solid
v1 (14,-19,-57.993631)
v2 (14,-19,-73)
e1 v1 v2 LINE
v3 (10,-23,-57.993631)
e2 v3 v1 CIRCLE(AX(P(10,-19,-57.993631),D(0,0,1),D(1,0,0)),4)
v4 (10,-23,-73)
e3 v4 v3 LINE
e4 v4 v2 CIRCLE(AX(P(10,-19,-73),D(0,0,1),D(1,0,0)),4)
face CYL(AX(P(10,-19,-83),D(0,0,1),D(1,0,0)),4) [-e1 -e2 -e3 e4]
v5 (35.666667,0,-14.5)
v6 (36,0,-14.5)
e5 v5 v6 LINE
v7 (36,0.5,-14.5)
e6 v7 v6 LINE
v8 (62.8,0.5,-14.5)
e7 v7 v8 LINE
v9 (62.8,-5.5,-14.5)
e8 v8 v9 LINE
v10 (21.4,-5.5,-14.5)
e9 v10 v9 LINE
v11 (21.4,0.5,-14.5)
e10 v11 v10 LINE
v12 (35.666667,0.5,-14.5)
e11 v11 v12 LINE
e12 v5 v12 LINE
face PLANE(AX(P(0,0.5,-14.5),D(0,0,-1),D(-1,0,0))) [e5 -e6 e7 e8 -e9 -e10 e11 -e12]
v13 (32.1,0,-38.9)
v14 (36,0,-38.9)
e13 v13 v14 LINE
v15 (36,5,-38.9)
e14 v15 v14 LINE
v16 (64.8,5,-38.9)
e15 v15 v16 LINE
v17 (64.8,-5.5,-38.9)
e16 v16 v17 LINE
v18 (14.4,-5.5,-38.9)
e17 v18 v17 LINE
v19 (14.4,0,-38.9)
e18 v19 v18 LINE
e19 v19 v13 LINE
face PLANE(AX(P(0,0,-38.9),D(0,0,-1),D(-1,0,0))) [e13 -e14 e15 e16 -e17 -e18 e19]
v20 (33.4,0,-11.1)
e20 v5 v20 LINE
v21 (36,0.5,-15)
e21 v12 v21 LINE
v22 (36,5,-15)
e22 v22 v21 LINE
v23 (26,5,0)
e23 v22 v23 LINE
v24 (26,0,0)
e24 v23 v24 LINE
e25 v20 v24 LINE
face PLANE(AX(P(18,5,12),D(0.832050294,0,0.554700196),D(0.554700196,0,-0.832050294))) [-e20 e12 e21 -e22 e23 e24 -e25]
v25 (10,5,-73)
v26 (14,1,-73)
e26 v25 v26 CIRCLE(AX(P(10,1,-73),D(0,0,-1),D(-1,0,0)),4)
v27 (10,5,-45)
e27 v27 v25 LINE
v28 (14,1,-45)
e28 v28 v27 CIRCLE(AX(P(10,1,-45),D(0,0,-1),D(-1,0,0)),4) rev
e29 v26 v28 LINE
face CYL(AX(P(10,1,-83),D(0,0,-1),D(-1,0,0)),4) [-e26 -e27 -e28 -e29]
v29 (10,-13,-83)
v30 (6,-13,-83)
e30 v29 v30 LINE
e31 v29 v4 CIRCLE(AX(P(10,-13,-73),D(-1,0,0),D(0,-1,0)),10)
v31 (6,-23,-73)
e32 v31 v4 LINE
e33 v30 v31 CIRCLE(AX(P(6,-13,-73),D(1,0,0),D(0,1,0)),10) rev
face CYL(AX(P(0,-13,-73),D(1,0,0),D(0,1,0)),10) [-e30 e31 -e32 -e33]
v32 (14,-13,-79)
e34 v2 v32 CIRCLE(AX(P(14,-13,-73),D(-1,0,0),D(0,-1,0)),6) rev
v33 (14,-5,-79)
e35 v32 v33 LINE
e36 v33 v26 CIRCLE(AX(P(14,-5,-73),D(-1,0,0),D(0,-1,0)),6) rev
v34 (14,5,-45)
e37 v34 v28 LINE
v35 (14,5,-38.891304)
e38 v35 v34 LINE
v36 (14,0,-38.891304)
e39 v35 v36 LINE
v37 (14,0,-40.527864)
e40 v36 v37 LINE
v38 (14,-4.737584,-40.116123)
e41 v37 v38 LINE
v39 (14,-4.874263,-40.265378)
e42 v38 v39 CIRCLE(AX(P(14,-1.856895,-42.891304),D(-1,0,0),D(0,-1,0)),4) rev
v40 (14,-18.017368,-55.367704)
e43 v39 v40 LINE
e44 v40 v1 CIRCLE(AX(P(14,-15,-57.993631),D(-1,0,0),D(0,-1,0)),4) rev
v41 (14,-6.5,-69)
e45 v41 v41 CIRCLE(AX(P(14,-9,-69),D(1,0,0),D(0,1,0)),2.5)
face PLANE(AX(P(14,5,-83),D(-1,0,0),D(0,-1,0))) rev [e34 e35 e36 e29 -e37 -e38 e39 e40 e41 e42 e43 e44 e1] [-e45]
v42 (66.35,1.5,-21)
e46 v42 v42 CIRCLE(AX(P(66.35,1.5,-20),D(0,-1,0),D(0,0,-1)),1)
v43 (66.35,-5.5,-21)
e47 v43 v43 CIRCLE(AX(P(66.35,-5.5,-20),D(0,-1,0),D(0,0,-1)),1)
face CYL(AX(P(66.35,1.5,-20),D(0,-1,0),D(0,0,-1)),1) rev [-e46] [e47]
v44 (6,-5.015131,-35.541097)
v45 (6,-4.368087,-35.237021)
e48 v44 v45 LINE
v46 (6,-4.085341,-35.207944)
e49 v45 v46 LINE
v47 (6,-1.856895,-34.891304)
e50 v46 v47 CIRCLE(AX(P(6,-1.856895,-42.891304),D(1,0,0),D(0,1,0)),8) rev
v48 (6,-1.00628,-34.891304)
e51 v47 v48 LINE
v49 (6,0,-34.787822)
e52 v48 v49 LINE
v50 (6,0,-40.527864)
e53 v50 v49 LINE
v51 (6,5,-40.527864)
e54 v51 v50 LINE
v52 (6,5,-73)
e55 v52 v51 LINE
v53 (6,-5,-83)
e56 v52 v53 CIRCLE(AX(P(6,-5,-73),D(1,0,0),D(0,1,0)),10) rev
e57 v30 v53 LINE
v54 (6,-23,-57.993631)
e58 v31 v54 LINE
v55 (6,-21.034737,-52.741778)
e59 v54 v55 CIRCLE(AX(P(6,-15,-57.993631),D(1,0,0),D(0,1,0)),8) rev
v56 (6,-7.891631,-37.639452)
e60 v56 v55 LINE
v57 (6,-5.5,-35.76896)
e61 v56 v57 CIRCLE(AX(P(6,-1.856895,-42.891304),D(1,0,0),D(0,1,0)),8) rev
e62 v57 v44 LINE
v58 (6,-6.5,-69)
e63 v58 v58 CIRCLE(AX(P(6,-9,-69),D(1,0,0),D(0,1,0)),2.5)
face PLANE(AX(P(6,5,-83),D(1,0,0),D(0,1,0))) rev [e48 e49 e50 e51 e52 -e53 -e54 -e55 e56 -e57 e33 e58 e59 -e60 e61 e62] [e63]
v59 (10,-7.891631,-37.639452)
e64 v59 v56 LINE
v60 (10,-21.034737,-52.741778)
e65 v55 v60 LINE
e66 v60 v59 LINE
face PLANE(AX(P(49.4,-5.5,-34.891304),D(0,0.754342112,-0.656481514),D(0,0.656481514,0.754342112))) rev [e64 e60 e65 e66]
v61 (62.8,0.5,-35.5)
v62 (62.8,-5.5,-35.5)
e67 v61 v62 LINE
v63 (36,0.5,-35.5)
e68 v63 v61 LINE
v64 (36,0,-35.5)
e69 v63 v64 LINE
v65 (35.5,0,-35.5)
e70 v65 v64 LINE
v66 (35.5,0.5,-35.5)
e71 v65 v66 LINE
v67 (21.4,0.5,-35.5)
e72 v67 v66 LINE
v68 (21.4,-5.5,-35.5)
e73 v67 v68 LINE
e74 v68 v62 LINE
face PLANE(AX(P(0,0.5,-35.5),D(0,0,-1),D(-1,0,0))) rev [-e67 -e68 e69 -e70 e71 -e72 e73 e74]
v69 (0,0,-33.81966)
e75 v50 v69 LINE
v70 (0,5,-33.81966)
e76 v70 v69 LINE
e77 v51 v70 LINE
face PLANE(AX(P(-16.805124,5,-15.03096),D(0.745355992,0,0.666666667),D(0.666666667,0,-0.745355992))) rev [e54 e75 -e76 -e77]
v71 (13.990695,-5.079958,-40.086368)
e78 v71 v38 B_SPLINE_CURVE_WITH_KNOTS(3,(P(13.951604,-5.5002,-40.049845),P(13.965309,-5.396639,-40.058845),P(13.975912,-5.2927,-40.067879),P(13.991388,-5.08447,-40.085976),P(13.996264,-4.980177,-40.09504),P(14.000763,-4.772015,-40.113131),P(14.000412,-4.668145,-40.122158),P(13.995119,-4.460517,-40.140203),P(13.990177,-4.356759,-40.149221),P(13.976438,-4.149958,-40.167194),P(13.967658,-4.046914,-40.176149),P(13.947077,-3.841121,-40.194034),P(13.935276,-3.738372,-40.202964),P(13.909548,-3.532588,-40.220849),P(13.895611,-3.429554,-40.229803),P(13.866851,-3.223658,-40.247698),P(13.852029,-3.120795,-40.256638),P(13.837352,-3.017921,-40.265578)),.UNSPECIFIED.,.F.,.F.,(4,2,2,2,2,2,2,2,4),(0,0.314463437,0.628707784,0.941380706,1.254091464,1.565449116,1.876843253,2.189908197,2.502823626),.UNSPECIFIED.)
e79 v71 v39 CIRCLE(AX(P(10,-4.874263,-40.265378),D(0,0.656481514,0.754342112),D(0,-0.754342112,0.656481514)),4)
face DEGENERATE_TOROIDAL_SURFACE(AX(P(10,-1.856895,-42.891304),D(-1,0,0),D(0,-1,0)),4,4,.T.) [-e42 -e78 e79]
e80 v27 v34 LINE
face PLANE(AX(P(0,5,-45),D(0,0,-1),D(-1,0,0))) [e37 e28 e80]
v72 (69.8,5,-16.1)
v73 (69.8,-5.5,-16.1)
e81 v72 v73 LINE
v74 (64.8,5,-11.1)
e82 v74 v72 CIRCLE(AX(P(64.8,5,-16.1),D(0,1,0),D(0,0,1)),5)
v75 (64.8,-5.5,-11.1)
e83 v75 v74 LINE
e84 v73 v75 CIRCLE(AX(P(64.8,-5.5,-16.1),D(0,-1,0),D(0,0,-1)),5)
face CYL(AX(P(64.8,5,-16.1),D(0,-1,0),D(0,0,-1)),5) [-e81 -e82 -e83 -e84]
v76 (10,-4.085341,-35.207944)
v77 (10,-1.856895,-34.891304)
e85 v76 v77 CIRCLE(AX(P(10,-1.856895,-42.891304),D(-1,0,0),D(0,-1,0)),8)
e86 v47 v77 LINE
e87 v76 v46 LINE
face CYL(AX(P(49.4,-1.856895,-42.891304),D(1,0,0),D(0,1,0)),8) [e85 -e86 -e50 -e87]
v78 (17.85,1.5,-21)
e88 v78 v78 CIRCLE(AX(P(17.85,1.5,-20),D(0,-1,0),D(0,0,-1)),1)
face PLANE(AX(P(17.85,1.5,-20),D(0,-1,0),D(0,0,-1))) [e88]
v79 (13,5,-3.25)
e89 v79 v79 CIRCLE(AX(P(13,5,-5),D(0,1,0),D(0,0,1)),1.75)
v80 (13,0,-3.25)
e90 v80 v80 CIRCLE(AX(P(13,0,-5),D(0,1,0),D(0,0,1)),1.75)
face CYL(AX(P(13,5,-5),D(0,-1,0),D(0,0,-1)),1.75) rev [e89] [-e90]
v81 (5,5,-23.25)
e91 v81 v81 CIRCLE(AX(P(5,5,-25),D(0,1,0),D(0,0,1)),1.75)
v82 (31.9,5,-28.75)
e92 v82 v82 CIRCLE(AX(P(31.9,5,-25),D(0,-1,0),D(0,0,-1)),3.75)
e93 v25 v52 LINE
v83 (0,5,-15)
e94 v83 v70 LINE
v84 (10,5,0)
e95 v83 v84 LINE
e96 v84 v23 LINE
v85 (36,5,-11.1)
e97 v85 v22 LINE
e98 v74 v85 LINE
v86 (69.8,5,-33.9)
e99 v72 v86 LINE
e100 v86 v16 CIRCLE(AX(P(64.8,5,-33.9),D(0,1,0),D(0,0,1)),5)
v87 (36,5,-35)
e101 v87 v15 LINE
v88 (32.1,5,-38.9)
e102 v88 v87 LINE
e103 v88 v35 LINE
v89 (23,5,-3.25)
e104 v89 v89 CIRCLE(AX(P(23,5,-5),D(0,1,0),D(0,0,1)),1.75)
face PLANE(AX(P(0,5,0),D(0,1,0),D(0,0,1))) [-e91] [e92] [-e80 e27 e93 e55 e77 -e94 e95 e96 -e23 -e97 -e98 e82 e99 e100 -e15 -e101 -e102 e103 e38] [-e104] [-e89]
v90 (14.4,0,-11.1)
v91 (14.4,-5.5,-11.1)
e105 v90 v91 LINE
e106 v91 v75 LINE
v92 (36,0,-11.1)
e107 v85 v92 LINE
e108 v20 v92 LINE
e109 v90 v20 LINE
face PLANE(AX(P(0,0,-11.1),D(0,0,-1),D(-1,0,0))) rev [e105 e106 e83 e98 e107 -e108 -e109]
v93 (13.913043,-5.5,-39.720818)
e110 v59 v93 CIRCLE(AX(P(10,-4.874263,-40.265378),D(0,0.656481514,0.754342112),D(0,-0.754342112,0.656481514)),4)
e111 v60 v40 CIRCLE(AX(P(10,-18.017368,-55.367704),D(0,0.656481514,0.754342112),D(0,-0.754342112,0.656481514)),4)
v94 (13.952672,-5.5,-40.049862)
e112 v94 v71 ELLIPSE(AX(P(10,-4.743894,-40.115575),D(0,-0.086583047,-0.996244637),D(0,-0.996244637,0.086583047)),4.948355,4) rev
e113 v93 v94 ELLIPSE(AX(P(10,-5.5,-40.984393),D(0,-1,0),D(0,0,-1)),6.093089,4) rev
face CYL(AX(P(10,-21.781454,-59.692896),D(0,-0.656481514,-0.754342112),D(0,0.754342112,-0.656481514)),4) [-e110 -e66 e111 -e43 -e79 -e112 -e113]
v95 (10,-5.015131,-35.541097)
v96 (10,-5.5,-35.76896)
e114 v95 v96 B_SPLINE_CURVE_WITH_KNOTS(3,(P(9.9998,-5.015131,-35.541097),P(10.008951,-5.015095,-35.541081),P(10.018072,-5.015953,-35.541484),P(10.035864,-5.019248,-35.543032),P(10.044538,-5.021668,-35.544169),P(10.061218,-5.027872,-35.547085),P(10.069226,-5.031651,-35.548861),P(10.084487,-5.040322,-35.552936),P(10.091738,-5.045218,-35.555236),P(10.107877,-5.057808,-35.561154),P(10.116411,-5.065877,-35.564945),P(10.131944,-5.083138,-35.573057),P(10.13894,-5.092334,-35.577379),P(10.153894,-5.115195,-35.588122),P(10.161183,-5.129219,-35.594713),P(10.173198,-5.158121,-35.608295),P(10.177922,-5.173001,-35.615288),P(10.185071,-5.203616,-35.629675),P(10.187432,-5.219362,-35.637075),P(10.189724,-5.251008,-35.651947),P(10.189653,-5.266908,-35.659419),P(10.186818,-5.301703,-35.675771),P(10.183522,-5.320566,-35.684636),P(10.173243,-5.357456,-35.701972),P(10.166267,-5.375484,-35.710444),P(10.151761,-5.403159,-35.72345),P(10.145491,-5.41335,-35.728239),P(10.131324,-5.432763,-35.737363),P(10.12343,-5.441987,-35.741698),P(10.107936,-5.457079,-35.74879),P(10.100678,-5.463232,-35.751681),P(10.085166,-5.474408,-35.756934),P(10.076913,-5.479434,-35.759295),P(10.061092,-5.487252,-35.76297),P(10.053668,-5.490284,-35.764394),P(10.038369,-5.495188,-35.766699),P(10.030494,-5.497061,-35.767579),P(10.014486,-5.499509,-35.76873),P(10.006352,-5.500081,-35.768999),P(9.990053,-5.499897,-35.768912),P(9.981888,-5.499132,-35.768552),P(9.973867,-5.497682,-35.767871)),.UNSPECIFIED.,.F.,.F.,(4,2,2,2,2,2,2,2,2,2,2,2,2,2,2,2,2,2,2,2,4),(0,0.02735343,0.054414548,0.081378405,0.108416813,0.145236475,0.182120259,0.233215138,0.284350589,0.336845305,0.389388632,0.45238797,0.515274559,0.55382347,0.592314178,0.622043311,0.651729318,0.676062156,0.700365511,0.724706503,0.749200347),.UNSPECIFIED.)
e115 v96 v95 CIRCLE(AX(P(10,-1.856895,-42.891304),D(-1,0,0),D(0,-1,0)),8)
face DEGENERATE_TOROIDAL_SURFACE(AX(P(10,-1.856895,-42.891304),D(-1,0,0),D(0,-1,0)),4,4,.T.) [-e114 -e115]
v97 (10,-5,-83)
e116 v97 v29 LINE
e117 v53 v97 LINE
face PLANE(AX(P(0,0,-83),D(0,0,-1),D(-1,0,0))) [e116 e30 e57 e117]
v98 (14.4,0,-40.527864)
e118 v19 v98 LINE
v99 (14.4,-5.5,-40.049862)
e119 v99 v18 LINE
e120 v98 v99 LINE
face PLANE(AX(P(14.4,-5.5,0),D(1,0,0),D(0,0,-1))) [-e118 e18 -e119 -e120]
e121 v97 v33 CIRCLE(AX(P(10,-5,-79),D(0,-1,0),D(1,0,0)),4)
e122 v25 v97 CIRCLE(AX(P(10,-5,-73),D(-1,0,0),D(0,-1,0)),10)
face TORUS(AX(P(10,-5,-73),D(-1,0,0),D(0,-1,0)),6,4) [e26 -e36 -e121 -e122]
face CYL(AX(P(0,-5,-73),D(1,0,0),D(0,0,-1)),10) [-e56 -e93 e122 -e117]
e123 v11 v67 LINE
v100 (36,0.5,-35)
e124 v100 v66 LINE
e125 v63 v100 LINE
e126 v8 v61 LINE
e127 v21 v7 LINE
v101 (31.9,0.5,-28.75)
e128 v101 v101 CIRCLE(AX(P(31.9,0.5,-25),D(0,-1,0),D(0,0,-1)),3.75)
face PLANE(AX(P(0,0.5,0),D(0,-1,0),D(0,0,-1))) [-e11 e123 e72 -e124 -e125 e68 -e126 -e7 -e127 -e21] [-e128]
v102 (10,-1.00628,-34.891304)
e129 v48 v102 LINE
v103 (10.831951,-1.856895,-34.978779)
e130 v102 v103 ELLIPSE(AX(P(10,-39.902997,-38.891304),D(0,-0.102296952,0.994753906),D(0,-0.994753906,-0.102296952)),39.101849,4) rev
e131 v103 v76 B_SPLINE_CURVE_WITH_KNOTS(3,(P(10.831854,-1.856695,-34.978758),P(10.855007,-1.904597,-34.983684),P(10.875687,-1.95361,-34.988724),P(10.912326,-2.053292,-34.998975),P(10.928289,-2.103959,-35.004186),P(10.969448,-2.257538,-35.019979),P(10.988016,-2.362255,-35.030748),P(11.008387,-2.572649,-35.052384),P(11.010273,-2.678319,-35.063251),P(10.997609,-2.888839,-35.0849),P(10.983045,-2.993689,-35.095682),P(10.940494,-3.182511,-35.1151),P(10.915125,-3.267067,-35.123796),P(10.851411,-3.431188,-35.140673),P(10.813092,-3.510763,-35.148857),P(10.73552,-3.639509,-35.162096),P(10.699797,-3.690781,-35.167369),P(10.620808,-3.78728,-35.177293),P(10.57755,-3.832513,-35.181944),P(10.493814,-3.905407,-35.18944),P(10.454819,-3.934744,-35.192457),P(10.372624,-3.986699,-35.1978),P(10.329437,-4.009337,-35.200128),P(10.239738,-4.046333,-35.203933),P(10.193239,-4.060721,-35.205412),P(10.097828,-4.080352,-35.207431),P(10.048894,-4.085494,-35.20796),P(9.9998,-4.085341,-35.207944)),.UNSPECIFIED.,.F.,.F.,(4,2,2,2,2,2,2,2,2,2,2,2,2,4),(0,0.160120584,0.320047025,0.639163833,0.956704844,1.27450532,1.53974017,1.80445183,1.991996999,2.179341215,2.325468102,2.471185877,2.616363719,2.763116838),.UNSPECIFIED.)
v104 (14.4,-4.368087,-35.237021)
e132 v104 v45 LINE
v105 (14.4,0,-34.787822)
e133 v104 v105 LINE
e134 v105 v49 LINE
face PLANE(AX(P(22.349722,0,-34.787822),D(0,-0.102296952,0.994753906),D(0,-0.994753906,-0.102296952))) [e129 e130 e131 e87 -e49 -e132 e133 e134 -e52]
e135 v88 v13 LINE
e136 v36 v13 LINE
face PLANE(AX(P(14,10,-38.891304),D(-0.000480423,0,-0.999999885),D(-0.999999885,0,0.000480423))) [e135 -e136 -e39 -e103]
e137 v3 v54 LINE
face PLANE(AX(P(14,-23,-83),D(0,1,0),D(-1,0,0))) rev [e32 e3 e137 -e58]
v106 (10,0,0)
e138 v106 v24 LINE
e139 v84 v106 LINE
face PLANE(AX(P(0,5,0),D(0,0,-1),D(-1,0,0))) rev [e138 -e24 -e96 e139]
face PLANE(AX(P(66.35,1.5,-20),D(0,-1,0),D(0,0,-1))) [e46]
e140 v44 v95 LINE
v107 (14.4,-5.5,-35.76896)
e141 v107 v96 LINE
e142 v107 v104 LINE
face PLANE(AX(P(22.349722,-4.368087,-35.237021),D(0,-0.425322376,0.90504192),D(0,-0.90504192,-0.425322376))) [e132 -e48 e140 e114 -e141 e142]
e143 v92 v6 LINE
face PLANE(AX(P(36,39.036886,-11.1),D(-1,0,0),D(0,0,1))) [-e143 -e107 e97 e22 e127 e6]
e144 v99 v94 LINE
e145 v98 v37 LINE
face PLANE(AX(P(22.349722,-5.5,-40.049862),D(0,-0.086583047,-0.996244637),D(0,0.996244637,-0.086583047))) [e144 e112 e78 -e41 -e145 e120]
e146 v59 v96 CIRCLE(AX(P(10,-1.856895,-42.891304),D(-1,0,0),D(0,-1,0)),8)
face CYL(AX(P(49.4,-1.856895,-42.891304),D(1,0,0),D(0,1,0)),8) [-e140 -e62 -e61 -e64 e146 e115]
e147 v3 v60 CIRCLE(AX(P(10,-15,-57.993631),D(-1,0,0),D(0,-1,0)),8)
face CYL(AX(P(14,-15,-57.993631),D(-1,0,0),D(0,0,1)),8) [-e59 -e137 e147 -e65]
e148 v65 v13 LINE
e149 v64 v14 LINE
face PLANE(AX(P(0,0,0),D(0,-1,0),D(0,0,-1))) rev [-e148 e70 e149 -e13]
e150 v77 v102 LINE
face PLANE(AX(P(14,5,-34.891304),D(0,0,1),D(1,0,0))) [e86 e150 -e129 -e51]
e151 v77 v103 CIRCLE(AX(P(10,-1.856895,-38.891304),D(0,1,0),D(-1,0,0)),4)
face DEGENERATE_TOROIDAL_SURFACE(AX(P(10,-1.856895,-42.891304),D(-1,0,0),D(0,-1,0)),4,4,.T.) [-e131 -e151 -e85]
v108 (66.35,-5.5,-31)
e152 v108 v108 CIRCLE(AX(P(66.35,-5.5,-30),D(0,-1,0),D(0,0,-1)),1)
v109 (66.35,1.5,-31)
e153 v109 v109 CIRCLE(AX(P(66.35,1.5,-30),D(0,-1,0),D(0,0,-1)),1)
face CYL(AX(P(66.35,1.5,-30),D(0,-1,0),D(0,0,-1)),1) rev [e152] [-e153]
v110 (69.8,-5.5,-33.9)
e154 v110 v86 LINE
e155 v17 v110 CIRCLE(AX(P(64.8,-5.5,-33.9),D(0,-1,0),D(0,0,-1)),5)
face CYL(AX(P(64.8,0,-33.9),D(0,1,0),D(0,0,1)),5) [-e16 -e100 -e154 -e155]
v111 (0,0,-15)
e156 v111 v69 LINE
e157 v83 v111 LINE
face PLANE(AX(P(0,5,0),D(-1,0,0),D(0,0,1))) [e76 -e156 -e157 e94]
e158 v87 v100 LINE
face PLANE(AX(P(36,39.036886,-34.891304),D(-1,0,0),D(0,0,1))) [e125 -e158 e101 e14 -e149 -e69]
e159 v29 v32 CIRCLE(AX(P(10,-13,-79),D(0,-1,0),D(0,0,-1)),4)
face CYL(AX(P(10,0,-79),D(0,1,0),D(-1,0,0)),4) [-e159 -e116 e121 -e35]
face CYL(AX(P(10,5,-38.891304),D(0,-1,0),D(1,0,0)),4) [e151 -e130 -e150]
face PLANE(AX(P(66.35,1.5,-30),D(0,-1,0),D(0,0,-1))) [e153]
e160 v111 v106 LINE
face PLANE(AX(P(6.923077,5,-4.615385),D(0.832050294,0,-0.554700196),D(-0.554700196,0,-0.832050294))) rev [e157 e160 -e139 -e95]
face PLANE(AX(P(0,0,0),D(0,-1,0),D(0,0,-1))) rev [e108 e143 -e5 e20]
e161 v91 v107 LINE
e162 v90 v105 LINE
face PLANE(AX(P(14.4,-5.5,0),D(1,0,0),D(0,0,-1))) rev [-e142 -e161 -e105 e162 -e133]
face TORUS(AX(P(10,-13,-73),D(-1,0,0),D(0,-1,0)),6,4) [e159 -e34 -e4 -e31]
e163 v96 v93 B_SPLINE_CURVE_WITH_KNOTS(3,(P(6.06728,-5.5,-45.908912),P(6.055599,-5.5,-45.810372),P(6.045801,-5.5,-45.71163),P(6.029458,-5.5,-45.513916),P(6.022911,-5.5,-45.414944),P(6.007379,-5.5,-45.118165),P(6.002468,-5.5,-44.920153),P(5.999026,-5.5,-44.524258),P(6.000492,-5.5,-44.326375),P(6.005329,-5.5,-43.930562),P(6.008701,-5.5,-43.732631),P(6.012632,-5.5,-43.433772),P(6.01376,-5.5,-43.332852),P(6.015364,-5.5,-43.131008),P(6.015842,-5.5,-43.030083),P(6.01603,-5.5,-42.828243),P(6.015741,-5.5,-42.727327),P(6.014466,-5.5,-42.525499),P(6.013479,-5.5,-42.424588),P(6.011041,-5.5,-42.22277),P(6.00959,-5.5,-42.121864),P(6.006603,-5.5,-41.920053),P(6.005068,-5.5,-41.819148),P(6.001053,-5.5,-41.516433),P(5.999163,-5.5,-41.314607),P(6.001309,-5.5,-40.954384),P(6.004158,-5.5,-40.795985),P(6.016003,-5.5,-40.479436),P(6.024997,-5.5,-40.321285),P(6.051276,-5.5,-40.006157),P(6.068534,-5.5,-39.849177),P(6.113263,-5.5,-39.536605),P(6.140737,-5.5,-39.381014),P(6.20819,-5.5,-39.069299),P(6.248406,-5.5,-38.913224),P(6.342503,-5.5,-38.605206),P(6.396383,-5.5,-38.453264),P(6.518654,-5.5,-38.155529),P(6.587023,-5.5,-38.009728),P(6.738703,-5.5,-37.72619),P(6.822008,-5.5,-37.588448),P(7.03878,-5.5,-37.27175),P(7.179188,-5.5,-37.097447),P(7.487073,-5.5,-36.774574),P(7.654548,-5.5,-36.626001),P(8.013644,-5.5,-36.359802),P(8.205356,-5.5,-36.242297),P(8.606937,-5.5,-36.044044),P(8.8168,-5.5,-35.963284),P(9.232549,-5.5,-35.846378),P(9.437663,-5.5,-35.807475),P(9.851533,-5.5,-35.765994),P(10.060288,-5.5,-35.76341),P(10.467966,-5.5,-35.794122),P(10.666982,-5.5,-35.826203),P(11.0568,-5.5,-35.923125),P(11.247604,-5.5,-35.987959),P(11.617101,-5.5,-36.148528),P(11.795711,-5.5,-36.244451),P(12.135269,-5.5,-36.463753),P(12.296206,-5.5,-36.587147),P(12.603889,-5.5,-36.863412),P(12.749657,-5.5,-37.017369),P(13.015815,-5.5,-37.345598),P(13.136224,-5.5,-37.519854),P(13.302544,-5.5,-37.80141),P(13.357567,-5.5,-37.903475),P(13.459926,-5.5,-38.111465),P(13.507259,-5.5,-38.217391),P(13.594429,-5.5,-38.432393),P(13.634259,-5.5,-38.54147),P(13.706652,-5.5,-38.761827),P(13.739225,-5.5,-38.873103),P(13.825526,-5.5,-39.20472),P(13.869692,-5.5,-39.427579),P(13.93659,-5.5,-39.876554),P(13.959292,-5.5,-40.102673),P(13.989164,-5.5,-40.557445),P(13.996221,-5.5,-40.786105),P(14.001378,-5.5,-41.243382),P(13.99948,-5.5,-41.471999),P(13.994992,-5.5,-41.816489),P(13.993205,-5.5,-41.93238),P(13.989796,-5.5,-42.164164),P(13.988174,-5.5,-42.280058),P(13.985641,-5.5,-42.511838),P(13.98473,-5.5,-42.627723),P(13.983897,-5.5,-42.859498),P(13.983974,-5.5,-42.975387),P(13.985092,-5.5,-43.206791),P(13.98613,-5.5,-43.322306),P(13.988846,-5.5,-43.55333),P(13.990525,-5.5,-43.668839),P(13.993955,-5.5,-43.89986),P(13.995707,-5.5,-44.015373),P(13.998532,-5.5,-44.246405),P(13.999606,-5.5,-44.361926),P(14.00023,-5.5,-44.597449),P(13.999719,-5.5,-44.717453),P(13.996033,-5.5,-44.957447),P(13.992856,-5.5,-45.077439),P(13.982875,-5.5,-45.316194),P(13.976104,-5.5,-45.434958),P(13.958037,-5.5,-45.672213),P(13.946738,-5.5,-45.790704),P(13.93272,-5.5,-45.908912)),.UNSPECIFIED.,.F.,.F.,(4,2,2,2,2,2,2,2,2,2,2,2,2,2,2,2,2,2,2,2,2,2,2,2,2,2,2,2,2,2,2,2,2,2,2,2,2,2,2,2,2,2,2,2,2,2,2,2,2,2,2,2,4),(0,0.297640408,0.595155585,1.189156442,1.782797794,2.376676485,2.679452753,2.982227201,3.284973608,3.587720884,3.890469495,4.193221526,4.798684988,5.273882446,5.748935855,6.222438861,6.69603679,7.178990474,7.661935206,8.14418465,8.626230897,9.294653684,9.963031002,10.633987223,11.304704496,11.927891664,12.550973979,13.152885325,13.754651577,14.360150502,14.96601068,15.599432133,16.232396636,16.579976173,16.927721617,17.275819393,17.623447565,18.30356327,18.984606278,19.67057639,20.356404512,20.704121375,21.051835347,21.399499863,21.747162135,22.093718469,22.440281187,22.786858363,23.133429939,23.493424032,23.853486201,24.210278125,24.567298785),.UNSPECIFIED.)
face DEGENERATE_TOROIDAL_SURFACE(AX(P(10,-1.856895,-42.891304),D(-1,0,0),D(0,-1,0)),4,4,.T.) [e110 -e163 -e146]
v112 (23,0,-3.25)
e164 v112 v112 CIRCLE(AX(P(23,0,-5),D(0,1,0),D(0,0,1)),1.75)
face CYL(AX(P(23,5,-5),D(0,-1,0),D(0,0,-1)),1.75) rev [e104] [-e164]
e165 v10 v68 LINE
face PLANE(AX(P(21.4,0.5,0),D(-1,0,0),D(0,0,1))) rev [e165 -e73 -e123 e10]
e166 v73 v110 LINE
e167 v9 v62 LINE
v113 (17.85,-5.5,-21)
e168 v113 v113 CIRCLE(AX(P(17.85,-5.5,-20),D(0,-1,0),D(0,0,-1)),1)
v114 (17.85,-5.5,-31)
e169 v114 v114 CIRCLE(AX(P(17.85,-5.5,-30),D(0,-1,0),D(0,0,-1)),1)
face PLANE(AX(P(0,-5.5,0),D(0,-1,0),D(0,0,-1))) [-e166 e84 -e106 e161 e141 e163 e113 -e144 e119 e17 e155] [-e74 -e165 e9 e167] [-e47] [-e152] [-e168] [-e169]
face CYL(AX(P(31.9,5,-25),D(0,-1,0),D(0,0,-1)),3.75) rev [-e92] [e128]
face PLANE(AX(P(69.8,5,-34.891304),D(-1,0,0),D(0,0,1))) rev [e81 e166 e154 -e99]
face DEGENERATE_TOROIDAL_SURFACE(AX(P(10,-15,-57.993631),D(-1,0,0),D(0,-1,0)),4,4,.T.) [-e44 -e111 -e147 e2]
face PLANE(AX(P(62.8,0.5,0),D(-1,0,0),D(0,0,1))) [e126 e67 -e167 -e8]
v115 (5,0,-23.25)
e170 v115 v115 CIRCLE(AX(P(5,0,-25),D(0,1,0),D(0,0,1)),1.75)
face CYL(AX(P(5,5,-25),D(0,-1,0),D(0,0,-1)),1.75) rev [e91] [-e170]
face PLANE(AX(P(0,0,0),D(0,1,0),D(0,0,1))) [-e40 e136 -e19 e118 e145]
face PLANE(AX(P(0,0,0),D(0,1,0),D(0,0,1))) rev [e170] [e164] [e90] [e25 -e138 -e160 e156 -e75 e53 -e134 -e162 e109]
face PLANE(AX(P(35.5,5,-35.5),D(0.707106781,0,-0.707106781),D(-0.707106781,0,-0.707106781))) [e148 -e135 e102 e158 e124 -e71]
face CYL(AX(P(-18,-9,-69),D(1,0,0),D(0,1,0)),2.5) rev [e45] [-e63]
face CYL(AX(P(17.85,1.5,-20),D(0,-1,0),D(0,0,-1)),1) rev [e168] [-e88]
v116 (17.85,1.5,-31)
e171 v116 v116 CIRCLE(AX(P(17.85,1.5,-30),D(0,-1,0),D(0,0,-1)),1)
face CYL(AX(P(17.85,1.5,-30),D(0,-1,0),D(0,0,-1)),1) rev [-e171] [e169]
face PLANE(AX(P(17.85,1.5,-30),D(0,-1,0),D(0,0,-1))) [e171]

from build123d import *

# Parameters (mm, degrees)
SKETCH1_R               = 1.75
SKETCH1_W               = 7.2
SKETCH1_H               = 10.8
BOSS_EXTRUDE2_DEPTH     = 5
FILLET1_R               = 5.4
FILLET2_R               = 5.4
FILLET3_RADIUS          = 10
FILLET3_LENGTH          = 5
SKETCH2_W               = 35
SKETCH2_H               = 19.782608696
SKETCH2_W_2             = 23
SKETCH2_H_2             = 13
BOSS_EXTRUDE3_DEPTH     = 5.5
SKETCH3_W               = 23
SKETCH3_H               = 13
CUT_EXTRUDE1_DEPTH      = 3.5
CUT_EXTRUDE2_DEPTH      = 76.201396264
CUT_EXTRUDE2_DEPTH_BACK = 76.201396264
SKETCH6_W               = 13.4
SKETCH6_H               = 0.108695652
CUT_EXTRUDE3_DEPTH      = 13.5
SKETCH7_W               = 8
SKETCH7_H               = 28
BOSS_EXTRUDE5_DEPTH     = 38
SKETCH8_R               = 2.5
CUT_EXTRUDE4_DEPTH      = 32
FILLET5_R               = 10
SKETCH9_R               = 1
CUT_EXTRUDE5_DEPTH      = 7
BOSS_EXTRUDE6_START     = -8
BOSS_EXTRUDE6_DEPTH     = 8
CUT_EXTRUDE8_DEPTH      = 97.444595494
FILLET8_R               = 8
FILLET10_R              = 4
BOSS_EXTRUDE7_START     = -1.5
BOSS_EXTRUDE7_OUTLINE_W = 23
BOSS_EXTRUDE7_OUTLINE_H = 13
BOSS_EXTRUDE7_DEPTH     = 1.5
SKETCH15_R              = 1
BOSS_EXTRUDE8_DEPTH     = 7
SKETCH16_W              = 23
SKETCH16_H              = 13
BOSS_EXTRUDE9_DEPTH     = 9
SKETCH23_W              = 22.4
SKETCH23_H              = 19.782608696
BOSS_EXTRUDE11_DEPTH    = 10.5
SKETCH32_W              = 2
SKETCH32_H              = 19.782608696
CUT_EXTRUDE10_DEPTH     = 112.132758447
SKETCH33_W              = 21.6
SKETCH33_H              = 4.008695652
BOSS_EXTRUDE26_DEPTH    = 5.5
SKETCH34_W              = 33.8
SKETCH34_H              = 4.008695652
BOSS_EXTRUDE27_DEPTH    = 10.5
SKETCH39_W              = 41.4
SKETCH39_H              = 21
CUT_EXTRUDE15_DEPTH     = 6
SKETCH40_R              = 1
CUT_EXTRUDE16_DEPTH     = 7
SKETCH41_R              = 1.75
SKETCH41_R_2            = 3.75
CUT_EXTRUDE17_DEPTH     = 111.965264835
CUT_EXTRUDE18_DEPTH     = 10
FILLET12_R              = 5
BOSS_EXTRUDE28_REACH    = 109.184


with BuildPart() as part:
    # Sketch1 → Boss-Extrude2 (new body)
    # profile 1 of 2: a face of its own
    with BuildSketch(Plane(origin=(0, 0, 0), x_dir=(1, 0, 0), z_dir=(0, 1, 0))):
        Polygon((26, 45), (10, 45), (0, 33.819660113), (0, 15), (10, 0), (26, 0), (36, 15), (60, 15), (60, 35), (36, 35), align=None)
        with Locations(Location((13, 5, 0), (0, 0, 270))):
            Circle(SKETCH1_R, mode=Mode.SUBTRACT)
        with Locations(Location((23, 5, 0), (0, 0, 270))):
            Circle(SKETCH1_R, mode=Mode.SUBTRACT)
        with Locations(Location((5, 25, 0), (0, 0, 270))):
            Circle(SKETCH1_R, mode=Mode.SUBTRACT)
        Polygon((26.5, 30.4), (37.3, 30.4), (44.5, 30.4), (44.5, 19.6), (37.3, 19.6), (26.5, 19.6), align=None, mode=Mode.SUBTRACT)
    # profile 2 of 2: a face of its own
    with BuildSketch(Plane(origin=(0, 0, 0), x_dir=(1, 0, 0), z_dir=(0, 1, 0))):
        with Locations((40.9, 25)):
            Rectangle(SKETCH1_W, SKETCH1_H)
    extrude(amount=BOSS_EXTRUDE2_DEPTH)

    # Fillet1
    fillet1_edges = [part.edges().sort_by_distance(p)[0] for p in [
        (37.3, 2.5, -19.6),
        (37.3, 2.5, -30.4),
    ]]
    fillet(fillet1_edges, radius=FILLET1_R - 0.0001)  # a hair under: the kernel refuses the full size

    # Fillet2
    fillet2_edges = [part.edges().sort_by_distance(p)[0] for p in [
        (26.5, 2.5, -30.4),
        (26.5, 2.5, -19.6),
    ]]
    fillet(fillet2_edges, radius=FILLET2_R - 0.0001)  # a hair under: the kernel refuses the full size

    # Fillet3: full round fillet: the end face becomes a half cylinder, R = half its width
    fillet3_face = Plane((60, 2.5, -25), x_dir=(0, 1, 0), z_dir=(1, 0, 0))  # on the end face: x along it, z out of the body
    fillet3_slab = fillet3_face.offset(-FILLET3_RADIUS / 2) * Box(FILLET3_LENGTH, 2 * FILLET3_RADIUS, FILLET3_RADIUS, mode=Mode.PRIVATE)  # the body's end, R deep
    fillet3_round = Plane((50, 2.5, -25), x_dir=(1, 0, 0), z_dir=(0, 1, 0)) * Cylinder(FILLET3_RADIUS, FILLET3_LENGTH, mode=Mode.PRIVATE)  # its axis R under the face
    add(fillet3_slab - fillet3_round, mode=Mode.SUBTRACT)

    # Sketch2 → Boss-Extrude3 (add)
    with BuildSketch(Plane.XZ):
        with Locations((31.9, -25)):
            Rectangle(SKETCH2_W, SKETCH2_H)
        with Locations((31.9, -25)):
            Rectangle(SKETCH2_W_2, SKETCH2_H_2, mode=Mode.SUBTRACT)
    extrude(amount=BOSS_EXTRUDE3_DEPTH)

    # Sketch3 → Cut-Extrude1 (cut)
    with BuildSketch(Plane.XZ):
        with Locations((31.9, -25)):
            Rectangle(SKETCH3_W, SKETCH3_H)
    extrude(amount=-CUT_EXTRUDE1_DEPTH, mode=Mode.SUBTRACT)

    # Sketch4 → Cut-Extrude2 (cut, two sides: drawn at the far end of the back side and taken through both)
    with BuildSketch(Plane.XZ.offset(-CUT_EXTRUDE2_DEPTH_BACK)):
        with BuildLine():
            Line((49.4, -15), (49.4, -35))
            Line((49.4, -35), (50, -35))
            ThreePointArc((50, -35), (60, -25), (50, -15))
            Line((50, -15), (49.4, -15))
        make_face()
    extrude(amount=CUT_EXTRUDE2_DEPTH + CUT_EXTRUDE2_DEPTH_BACK, mode=Mode.SUBTRACT)

    # Sketch6 → Cut-Extrude3 (cut)
    with BuildSketch(Plane.XZ):
        with Locations((42.7, -34.945652174)):
            Rectangle(SKETCH6_W, SKETCH6_H)
        with Locations((42.7, -15.054347826)):
            Rectangle(SKETCH6_W, SKETCH6_H)
    extrude(amount=-CUT_EXTRUDE3_DEPTH, mode=Mode.SUBTRACT)

    # Sketch7 → Boss-Extrude5 (add)
    with BuildSketch(Plane(origin=(0, 0, -45), x_dir=(-1, 0, 0), z_dir=(0, 0, -1))):
        with Locations((-10, -9)):
            Rectangle(SKETCH7_W, SKETCH7_H)
    extrude(amount=BOSS_EXTRUDE5_DEPTH)

    # Sketch8 → Cut-Extrude4 (cut)
    with BuildSketch(Plane(origin=(14, 0, 0), x_dir=(0, 0, -1), z_dir=(1, 0, 0))):
        with Locations(Location((69, -9, 0), (0, 0, 90))):
            Circle(SKETCH8_R)
    extrude(amount=-CUT_EXTRUDE4_DEPTH, mode=Mode.SUBTRACT)

    # Fillet5
    fillet5_edges = [part.edges().sort_by_distance(p)[0] for p in [
        (10, -23, -83),
        (10, 5, -83),
    ]]
    fillet(fillet5_edges, radius=FILLET5_R)

    # Sketch9 → Cut-Extrude5 (cut)
    with BuildSketch(Plane.XZ.offset(5.5)):
        with Locations(Location((18.1, -25, 0), (0, 0, 270))):
            Circle(SKETCH9_R)
        with Locations(Location((45.7, -25, 0), (0, 0, 270))):
            Circle(SKETCH9_R)
    extrude(amount=-CUT_EXTRUDE5_DEPTH, mode=Mode.SUBTRACT)

    # Sketch10 → Boss-Extrude6 (add)
    with BuildSketch(Plane.ZY.offset(-6).offset(BOSS_EXTRUDE6_START)):
        Polygon((-45, -23), (-45, 5), (-34.891304348, 5), (-34.891304348, -5.5), align=None)
    extrude(amount=BOSS_EXTRUDE6_DEPTH)

    # Sketch13 → Cut-Extrude8 (cut, through all)
    with BuildSketch(Plane.ZY.offset(-6)):
        Polygon((-45, -23), (-34.891304348, -5.5), (-55, -23), align=None)
    extrude(amount=-CUT_EXTRUDE8_DEPTH, mode=Mode.SUBTRACT)

    # Fillet8
    fillet8_edges = [part.edges().sort_by_distance(p)[0] for p in [
        (10, -5.5, -34.891304348),
        (10, -23, -55),
    ]]
    fillet(fillet8_edges, radius=FILLET8_R)

    # Fillet10
    fillet10_edges = [part.edges().sort_by_distance(p)[0] for p in [
        (14, -9, -83),
        (14, -23, -65.496815266),
        (14, 5, -59),
        (14, -20.071067812, -80.071067812),
        (14, 2.071067812, -80.071067812),
        (14, -14.463184152, -45.19061533),
        (14, -0.928447255, -34.891304348),
        (14, -22.492592848, -55.189873693),
        (14, -5.172402248, -35.610685663),
    ]]
    fillet(fillet10_edges, radius=FILLET10_R)

    # Boss-Extrude7: read off the stored shape, not the designer's step
    # Boss-Extrude7 outline → Boss-Extrude7 (add)
    with BuildSketch(Plane.XZ.offset(-3.5).offset(BOSS_EXTRUDE7_START)):
        with Locations((31.9, -25)):
            Rectangle(BOSS_EXTRUDE7_OUTLINE_W, BOSS_EXTRUDE7_OUTLINE_H)
    extrude(amount=BOSS_EXTRUDE7_DEPTH)

    # Sketch15 → Boss-Extrude8 (add)
    with BuildSketch(Plane.XZ.offset(5.5)):
        with Locations((18.1, -25)):
            Circle(SKETCH15_R)
        with Locations((45.7, -25)):
            Circle(SKETCH15_R)
    extrude(amount=-BOSS_EXTRUDE8_DEPTH)

    # Sketch16 → Boss-Extrude9 (add)
    with BuildSketch(Plane.XZ.offset(-3.5)):
        with Locations((31.9, -25)):
            Rectangle(SKETCH16_W, SKETCH16_H)
    extrude(amount=BOSS_EXTRUDE9_DEPTH)

    # Sketch23 → Boss-Extrude11 (add)
    with BuildSketch(Plane.XZ.offset(5.5)):
        with Locations((60.6, -25)):
            Rectangle(SKETCH23_W, SKETCH23_H)
    extrude(amount=-BOSS_EXTRUDE11_DEPTH)

    # Sketch32 → Cut-Extrude10 (cut, through all)
    with BuildSketch(Plane.XZ.offset(5.5)):
        with Locations((70.8, -25)):
            Rectangle(SKETCH32_W, SKETCH32_H)
    extrude(amount=-CUT_EXTRUDE10_DEPTH, mode=Mode.SUBTRACT)

    # Sketch33 → Boss-Extrude26 (add)
    with BuildSketch(Plane.XZ.offset(5.5)):
        with Locations((25.2, -13.104347826)):
            Rectangle(SKETCH33_W, SKETCH33_H)
        with Locations((25.2, -36.895652174)):
            Rectangle(SKETCH33_W, SKETCH33_H)
    extrude(amount=-BOSS_EXTRUDE26_DEPTH)

    # Sketch34 → Boss-Extrude27 (add)
    with BuildSketch(Plane.XZ.offset(5.5)):
        with Locations((52.9, -13.104347826)):
            Rectangle(SKETCH34_W, SKETCH34_H)
        with Locations((52.9, -36.895652174)):
            Rectangle(SKETCH34_W, SKETCH34_H)
    extrude(amount=-BOSS_EXTRUDE27_DEPTH)

    # Sketch39 → Cut-Extrude15 (cut)
    with BuildSketch(Plane.XZ.offset(5.5)):
        with Locations((42.1, -25)):
            Rectangle(SKETCH39_W, SKETCH39_H)
    extrude(amount=-CUT_EXTRUDE15_DEPTH, mode=Mode.SUBTRACT)

    # Sketch40 → Cut-Extrude16 (cut)
    with BuildSketch(Plane.XZ.offset(5.5)):
        with Locations(Location((66.35, -30, 0), (0, 0, 270))):
            Circle(SKETCH40_R)
        with Locations(Location((66.35, -20, 0), (0, 0, 270))):
            Circle(SKETCH40_R)
        with Locations(Location((17.85, -30, 0), (0, 0, 270))):
            Circle(SKETCH40_R)
        with Locations(Location((17.85, -20, 0), (0, 0, 270))):
            Circle(SKETCH40_R)
    extrude(amount=-CUT_EXTRUDE16_DEPTH, mode=Mode.SUBTRACT)

    # Sketch41 → Cut-Extrude17 (cut, through all)
    with BuildSketch(Plane.XZ.offset(-0.5)):
        with Locations(Location((5, -25, 0), (0, 0, 90))):
            Circle(SKETCH41_R)
        with Locations(Location((31.9, -25, 0), (0, 0, 270))):
            Circle(SKETCH41_R_2)
    extrude(amount=-CUT_EXTRUDE17_DEPTH, mode=Mode.SUBTRACT)

    # Sketch42 → Cut-Extrude18 (cut)
    with BuildSketch(Plane(origin=(0, 0, 0), x_dir=(1, 0, 0), z_dir=(0, 1, 0))):
        Polygon((14, 45), (14, 38.891304348), (32.1, 38.9), (26, 45), align=None)
    extrude(amount=CUT_EXTRUDE18_DEPTH, mode=Mode.SUBTRACT)

    # Fillet12
    fillet12_edges = [part.edges().sort_by_distance(p)[0] for p in [
        (69.8, -0.25, -11.1),
        (69.8, -0.25, -38.9),
    ]]
    fillet(fillet12_edges, radius=FILLET12_R)

    # Boss-Extrude28: up to this face of the body (flat: up to its plane)
    boss_extrude28_end = Plane(part.part.faces().sort_by_distance((14.4, -2.75, -25))[0])
    # Sketch44 → Boss-Extrude28 (add, up to the picked face)
    with BuildSketch(Plane.ZY.offset(-6), mode=Mode.PRIVATE) as boss_extrude28_sk1:
        Polygon((-40.527864045, 0), (-34.78782211, 0), (-35.237020655, -4.368087235), (-35.768960465, -5.5), (-40.049862217, -5.5), align=None)
    boss_extrude28_tool1 = split(extrude(boss_extrude28_sk1.sketch, amount=-BOSS_EXTRUDE28_REACH, mode=Mode.PRIVATE), bisect_by=boss_extrude28_end, keep=Keep.BOTH, mode=Mode.PRIVATE)
    add(boss_extrude28_tool1.solids().sort_by(Axis((6, -2.637977, -37.697403), (1, 0, 0)))[0])


solid = part.part
